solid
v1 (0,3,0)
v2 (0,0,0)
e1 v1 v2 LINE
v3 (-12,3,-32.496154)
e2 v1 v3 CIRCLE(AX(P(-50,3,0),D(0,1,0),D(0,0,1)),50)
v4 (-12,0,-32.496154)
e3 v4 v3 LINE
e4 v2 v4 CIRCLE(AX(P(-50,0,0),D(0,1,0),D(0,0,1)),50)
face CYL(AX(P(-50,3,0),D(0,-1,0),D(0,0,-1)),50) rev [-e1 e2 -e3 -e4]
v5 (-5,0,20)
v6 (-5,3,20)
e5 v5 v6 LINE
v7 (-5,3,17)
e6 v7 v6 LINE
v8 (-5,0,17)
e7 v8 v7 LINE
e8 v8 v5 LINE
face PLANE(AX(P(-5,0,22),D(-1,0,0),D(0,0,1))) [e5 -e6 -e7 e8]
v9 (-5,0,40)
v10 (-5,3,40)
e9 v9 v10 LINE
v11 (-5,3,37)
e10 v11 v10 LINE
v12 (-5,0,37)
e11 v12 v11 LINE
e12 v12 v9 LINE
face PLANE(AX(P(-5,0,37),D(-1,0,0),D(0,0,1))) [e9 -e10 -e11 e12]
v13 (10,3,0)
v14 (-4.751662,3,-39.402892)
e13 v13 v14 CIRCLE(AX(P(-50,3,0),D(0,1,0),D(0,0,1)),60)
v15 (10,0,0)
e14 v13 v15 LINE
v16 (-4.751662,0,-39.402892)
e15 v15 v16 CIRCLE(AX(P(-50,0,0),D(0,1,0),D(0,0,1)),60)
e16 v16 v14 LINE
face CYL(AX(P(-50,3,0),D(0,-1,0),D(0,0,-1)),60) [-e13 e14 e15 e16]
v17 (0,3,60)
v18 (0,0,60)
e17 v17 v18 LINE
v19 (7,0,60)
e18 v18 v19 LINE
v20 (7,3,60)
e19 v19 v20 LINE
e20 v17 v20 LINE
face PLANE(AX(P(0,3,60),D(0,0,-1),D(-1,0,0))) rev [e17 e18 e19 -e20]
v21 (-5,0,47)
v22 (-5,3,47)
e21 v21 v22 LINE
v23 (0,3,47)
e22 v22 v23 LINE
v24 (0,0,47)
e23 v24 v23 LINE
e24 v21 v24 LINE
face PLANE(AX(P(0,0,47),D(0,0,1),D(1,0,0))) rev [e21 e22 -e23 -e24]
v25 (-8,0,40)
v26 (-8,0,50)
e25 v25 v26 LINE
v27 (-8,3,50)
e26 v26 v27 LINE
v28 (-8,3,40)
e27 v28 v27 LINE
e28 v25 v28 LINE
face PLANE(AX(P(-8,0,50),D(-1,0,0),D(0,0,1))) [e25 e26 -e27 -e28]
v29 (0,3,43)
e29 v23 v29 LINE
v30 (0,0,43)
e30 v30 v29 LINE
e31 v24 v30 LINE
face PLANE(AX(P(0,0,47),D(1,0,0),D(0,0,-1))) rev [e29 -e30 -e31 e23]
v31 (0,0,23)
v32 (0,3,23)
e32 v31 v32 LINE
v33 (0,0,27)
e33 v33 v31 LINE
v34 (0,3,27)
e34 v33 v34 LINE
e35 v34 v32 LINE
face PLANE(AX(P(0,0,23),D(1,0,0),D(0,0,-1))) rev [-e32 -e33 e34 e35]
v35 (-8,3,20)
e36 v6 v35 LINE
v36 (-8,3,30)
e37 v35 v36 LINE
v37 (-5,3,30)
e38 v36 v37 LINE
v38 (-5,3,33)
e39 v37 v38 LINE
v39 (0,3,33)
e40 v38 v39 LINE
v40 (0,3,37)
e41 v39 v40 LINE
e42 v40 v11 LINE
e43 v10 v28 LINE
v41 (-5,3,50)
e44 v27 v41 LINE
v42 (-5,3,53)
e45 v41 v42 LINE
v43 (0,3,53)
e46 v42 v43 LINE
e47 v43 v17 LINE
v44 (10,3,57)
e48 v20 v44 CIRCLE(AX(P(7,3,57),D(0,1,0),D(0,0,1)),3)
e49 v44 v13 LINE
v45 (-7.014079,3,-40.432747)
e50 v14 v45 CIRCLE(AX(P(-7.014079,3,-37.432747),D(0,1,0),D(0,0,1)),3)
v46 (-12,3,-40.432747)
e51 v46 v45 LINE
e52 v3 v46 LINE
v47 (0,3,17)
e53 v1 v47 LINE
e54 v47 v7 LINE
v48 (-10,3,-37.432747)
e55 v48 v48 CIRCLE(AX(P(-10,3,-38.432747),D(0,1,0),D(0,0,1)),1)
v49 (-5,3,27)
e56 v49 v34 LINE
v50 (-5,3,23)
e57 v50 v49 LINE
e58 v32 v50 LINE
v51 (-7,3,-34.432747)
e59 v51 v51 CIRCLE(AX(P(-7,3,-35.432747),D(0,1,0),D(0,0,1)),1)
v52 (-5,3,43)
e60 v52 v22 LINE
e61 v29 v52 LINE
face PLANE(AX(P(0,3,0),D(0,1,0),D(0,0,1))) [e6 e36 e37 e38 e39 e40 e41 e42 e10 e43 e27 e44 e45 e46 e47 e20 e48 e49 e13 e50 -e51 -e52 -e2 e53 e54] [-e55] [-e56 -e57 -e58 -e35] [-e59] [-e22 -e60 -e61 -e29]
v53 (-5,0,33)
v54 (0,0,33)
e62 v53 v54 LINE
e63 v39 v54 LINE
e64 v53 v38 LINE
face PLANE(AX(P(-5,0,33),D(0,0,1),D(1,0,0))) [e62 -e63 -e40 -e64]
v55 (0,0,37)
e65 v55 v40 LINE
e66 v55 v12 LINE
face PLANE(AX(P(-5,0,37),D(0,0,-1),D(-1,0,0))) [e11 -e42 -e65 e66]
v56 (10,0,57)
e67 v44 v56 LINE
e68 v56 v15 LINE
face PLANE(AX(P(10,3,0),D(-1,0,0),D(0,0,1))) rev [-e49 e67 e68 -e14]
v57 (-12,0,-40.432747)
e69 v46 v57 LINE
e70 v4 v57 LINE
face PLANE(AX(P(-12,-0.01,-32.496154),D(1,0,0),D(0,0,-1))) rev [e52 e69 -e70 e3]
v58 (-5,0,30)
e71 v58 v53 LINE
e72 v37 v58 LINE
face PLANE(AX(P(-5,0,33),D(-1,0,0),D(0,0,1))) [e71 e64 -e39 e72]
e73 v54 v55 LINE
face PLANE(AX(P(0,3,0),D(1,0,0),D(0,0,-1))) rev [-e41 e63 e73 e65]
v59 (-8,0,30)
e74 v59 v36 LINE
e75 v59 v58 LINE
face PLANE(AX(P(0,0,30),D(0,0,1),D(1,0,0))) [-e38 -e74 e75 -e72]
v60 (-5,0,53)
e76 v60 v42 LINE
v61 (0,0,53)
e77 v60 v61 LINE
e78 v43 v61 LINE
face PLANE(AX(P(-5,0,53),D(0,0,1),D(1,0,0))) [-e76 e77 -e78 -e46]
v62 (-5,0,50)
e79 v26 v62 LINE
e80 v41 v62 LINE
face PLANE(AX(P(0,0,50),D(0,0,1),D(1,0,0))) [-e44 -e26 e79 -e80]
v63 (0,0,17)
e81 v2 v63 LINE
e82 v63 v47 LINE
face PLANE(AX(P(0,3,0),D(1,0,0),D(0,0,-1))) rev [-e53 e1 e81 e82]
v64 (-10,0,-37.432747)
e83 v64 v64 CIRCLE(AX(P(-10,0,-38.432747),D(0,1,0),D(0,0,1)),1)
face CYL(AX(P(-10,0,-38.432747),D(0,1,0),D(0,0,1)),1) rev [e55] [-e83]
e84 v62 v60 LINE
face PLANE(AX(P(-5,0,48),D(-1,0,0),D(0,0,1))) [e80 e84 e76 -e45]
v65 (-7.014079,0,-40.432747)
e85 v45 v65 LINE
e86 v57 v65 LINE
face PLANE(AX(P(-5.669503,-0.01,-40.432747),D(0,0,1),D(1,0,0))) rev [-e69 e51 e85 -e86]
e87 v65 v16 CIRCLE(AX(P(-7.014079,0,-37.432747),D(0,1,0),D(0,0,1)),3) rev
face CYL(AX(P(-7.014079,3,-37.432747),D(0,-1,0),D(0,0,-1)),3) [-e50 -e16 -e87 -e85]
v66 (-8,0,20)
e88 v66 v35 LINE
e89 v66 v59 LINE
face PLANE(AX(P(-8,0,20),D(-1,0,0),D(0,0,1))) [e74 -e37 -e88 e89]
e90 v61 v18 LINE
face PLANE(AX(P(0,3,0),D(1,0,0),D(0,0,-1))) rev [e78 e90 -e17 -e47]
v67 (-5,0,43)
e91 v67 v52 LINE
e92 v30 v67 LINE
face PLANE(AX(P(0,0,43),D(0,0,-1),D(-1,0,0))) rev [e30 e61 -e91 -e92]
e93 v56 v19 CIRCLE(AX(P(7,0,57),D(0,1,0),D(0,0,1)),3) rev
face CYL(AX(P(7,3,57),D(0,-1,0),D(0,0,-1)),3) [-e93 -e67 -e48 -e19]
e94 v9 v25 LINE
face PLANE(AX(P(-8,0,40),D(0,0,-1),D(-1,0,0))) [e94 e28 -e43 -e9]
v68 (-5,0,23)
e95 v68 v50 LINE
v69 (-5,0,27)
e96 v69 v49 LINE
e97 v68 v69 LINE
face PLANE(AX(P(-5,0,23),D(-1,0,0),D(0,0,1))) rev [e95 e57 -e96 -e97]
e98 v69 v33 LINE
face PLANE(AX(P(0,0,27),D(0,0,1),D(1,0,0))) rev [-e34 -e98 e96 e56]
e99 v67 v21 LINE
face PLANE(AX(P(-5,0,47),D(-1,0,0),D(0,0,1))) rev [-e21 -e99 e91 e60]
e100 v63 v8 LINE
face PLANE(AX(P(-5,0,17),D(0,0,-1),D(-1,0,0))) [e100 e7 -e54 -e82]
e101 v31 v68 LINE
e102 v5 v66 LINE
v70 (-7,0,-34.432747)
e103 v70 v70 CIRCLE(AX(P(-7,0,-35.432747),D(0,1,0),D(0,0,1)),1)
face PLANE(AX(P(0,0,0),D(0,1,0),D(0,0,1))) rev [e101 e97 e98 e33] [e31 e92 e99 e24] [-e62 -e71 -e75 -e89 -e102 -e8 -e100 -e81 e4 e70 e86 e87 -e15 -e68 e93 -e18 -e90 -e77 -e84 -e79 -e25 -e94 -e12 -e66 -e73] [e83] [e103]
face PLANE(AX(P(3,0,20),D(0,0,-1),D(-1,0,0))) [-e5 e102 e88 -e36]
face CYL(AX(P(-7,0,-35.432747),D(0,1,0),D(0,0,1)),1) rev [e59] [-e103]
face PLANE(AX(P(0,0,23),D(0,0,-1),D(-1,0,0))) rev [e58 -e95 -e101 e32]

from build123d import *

# Parameters (mm, degrees)
SKETCH1_R              = 50
BOSS_EXTRUDE1_DEPTH    = 3
SPLIT1_SURFACE_1_BACK  = 170.732
SPLIT1_SURFACE_1_DEPTH = 341.464
SPLIT1_SURFACE_2_BACK  = 170.732
SPLIT1_SURFACE_2_DEPTH = 341.464
BODY_DELETE1_DEPTH     = 3
FILLET1_R              = 3
BOSS_EXTRUDE4_DEPTH    = 3
SPLIT2_SURFACE_3_BACK  = 109.724
SPLIT2_SURFACE_3_DEPTH = 219.448
SPLIT2_SURFACE_4_BACK  = 109.724
SPLIT2_SURFACE_4_DEPTH = 219.448
FILLET2_R              = 3
SKETCH5_R              = 1
CUT_EXTRUDE1_DEPTH     = 3
SKETCH6_W              = 8
SKETCH6_H              = 5
BOSS_EXTRUDE5_DEPTH    = 3
SKETCH7_W              = 5
SKETCH7_H              = 4
CUT_EXTRUDE2_DEPTH     = 3


# Read off the part's stored shape, not the designer's step: Body-Delete1
with BuildPart() as part:
    # Sketch1 → Boss-Extrude1 (new body)
    with BuildSketch(Plane(origin=(0, 0, 0), x_dir=(1, 0, 0), z_dir=(0, 1, 0))):
        with BuildLine():
            ThreePointArc((10, 0), (-107.445626465, 17.320508076), (0, -33.166247904))
            Line((0, -33.166247904), (0, -60))
            Line((0, -60), (10, -60))
            Line((10, -60), (10, 0))
        make_face()
        with Locations(Location((-50, 0, 0), (0, 0, 270))):
            Circle(SKETCH1_R, mode=Mode.SUBTRACT)
    extrude(amount=BOSS_EXTRUDE1_DEPTH)


with BuildPart() as body_2:
    # Split1: the piece behind the surface
    add(part.part)
    # Split1 surface: a surface, the sketch's curves swept straight by 341.464 mm
    with BuildLine(Plane(origin=(0, 3, 0), x_dir=(1, 0, 0), z_dir=(0, 1, 0)).offset(-SPLIT1_SURFACE_1_BACK), mode=Mode.PRIVATE) as split1_surface_1_path:
        Line((0, -33.166247904), (0, 0))
        Line((0, 0), (-12, 0))
        Line((-12, 0), (-12, 32.496153619))
        Line((-12, 32.496153619), (-12, 67.159700612))
        Line((-12, 67.159700612), (-127.638562935, 67.159700612))
        Line((-127.638562935, 67.159700612), (-127.638562935, -72.196904976))
        Line((-127.638562935, -72.196904976), (0, -72.196904976))
        Line((0, -72.196904976), (0, -33.166247904))
    split1_surface_1 = Shell.extrude(split1_surface_1_path.wire(), (0 * SPLIT1_SURFACE_1_DEPTH, 1 * SPLIT1_SURFACE_1_DEPTH, 0 * SPLIT1_SURFACE_1_DEPTH))
    split(bisect_by=split1_surface_1, keep=Keep.BOTTOM)

    # Fillet1
    fillet1_edges = [body_2.edges().sort_by_distance(p)[0] for p in [
        (10, 1.5, 60),
    ]]
    fillet(fillet1_edges, radius=FILLET1_R)

    # Sketch3 → Boss-Extrude4 (add)
    with BuildSketch(Plane(origin=(0, 3, 0), x_dir=(1, 0, 0), z_dir=(0, 1, 0))):
        Polygon((0, -50), (-8, -50), (-8, -40), (0, -40), (3, -40), (3, -50), align=None)
        Polygon((-8, -20), (-8, -30), (0, -30), (3, -30), (3, -20), (0, -20), align=None)
    extrude(amount=-BOSS_EXTRUDE4_DEPTH)


with BuildPart() as part_1:
    add(part.part)

    # Split1: split by a surface, the side it looks to stays
    # Split1 surface: a surface, the sketch's curves swept straight by 341.464 mm
    with BuildLine(Plane(origin=(0, 3, 0), x_dir=(1, 0, 0), z_dir=(0, 1, 0)).offset(-SPLIT1_SURFACE_2_BACK), mode=Mode.PRIVATE) as split1_surface_2_path:
        Line((0, -33.166247904), (0, 0))
        Line((0, 0), (-12, 0))
        Line((-12, 0), (-12, 32.496153619))
        Line((-12, 32.496153619), (-12, 67.159700612))
        Line((-12, 67.159700612), (-127.638562935, 67.159700612))
        Line((-127.638562935, 67.159700612), (-127.638562935, -72.196904976))
        Line((-127.638562935, -72.196904976), (0, -72.196904976))
        Line((0, -72.196904976), (0, -33.166247904))
    split1_surface_2 = Shell.extrude(split1_surface_2_path.wire(), (0 * SPLIT1_SURFACE_2_DEPTH, 1 * SPLIT1_SURFACE_2_DEPTH, 0 * SPLIT1_SURFACE_2_DEPTH))
    split(bisect_by=split1_surface_2, keep=Keep.TOP)

    # Body-Delete1 outline → Body-Delete1 (cut)
    with BuildSketch(Plane(origin=(0, 0, 0), x_dir=(1, 0, 0), z_dir=(0, 1, 0))):
        with BuildLine():
            ThreePointArc((-12, 46.432747065), (-109.329587897, -8.94427191), (0, -33.166247904))
            Line((0, -33.166247904), (0, 0))
            ThreePointArc((0, 0), (-96.904157598, -17.320508075), (-12, 32.496153619))
            Line((-12, 32.496153619), (-12, 46.432747065))
        make_face()
    extrude(amount=BODY_DELETE1_DEPTH, mode=Mode.SUBTRACT)


with BuildPart() as body_2_2:
    # Split2: the piece behind the surface
    add(body_2.part)
    # Split2 surface: a surface, the sketch's curves swept straight by 219.448 mm
    with BuildLine(Plane(origin=(0, 3, 0), x_dir=(1, 0, 0), z_dir=(0, 1, 0)).offset(-SPLIT2_SURFACE_3_BACK), mode=Mode.PRIVATE) as split2_surface_3_path:
        Line((-12, 40.432747065), (-5.669502994, 40.432747065))
        Line((-5.669502994, 40.432747065), (-5.042290504, 40.432747065))
        Line((-5.042290504, 40.432747065), (-5.042290504, 47.453598883))
        Line((-5.042290504, 47.453598883), (-14.646815791, 47.453598883))
        Line((-14.646815791, 47.453598883), (-14.646815791, 40.432747065))
        Line((-14.646815791, 40.432747065), (-12, 40.432747065))
    split2_surface_3 = Shell.extrude(split2_surface_3_path.wire(), (0 * SPLIT2_SURFACE_3_DEPTH, 1 * SPLIT2_SURFACE_3_DEPTH, 0 * SPLIT2_SURFACE_3_DEPTH))
    split(bisect_by=split2_surface_3, keep=Keep.BOTTOM)

    # Fillet2
    fillet2_edges = [body_2_2.edges().sort_by_distance(p)[0] for p in [
        (-5.669502994, 1.5, -40.432747065),
    ]]
    fillet(fillet2_edges, radius=FILLET2_R)

    # Sketch5 → Cut-Extrude1 (cut)
    with BuildSketch(Plane(origin=(0, 3, 0), x_dir=(1, 0, 0), z_dir=(0, 1, 0))):
        with Locations(Location((-10, 38.432747065, 0), (0, 0, 270))):
            Circle(SKETCH5_R)
        with Locations(Location((-7, 35.432747065, 0), (0, 0, 270))):
            Circle(SKETCH5_R)
    extrude(amount=-CUT_EXTRUDE1_DEPTH, mode=Mode.SUBTRACT)

    # Sketch6 → Boss-Extrude5 (add)
    with BuildSketch(Plane(origin=(0, 3, 0), x_dir=(1, 0, 0), z_dir=(0, 1, 0))):
        with Locations((-1, -39.5)):
            Rectangle(SKETCH6_W, SKETCH6_H)
        with Locations((-1, -50.5)):
            Rectangle(SKETCH6_W, SKETCH6_H)
        with Locations((-1, -19.5)):
            Rectangle(SKETCH6_W, SKETCH6_H)
        with Locations((-1, -30.5)):
            Rectangle(SKETCH6_W, SKETCH6_H)
    extrude(amount=-BOSS_EXTRUDE5_DEPTH)

    # Sketch7 → Cut-Extrude2 (cut)
    with BuildSketch(Plane(origin=(0, 3, 0), x_dir=(1, 0, 0), z_dir=(0, 1, 0))):
        with Locations((-2.5, -25)):
            Rectangle(SKETCH7_W, SKETCH7_H)
        with Locations((-2.5, -45)):
            Rectangle(SKETCH7_W, SKETCH7_H)
    extrude(amount=-CUT_EXTRUDE2_DEPTH, mode=Mode.SUBTRACT)


with BuildPart() as body_2_1:
    add(body_2.part)

    # Split2: split by a surface, the side it looks to stays
    # Split2 surface: a surface, the sketch's curves swept straight by 219.448 mm
    with BuildLine(Plane(origin=(0, 3, 0), x_dir=(1, 0, 0), z_dir=(0, 1, 0)).offset(-SPLIT2_SURFACE_4_BACK), mode=Mode.PRIVATE) as split2_surface_4_path:
        Line((-12, 40.432747065), (-5.669502994, 40.432747065))
        Line((-5.669502994, 40.432747065), (-5.042290504, 40.432747065))
        Line((-5.042290504, 40.432747065), (-5.042290504, 47.453598883))
        Line((-5.042290504, 47.453598883), (-14.646815791, 47.453598883))
        Line((-14.646815791, 47.453598883), (-14.646815791, 40.432747065))
        Line((-14.646815791, 40.432747065), (-12, 40.432747065))
    split2_surface_4 = Shell.extrude(split2_surface_4_path.wire(), (0 * SPLIT2_SURFACE_4_DEPTH, 1 * SPLIT2_SURFACE_4_DEPTH, 0 * SPLIT2_SURFACE_4_DEPTH))
    split(bisect_by=split2_surface_4, keep=Keep.TOP)


solid = body_2_2.part
